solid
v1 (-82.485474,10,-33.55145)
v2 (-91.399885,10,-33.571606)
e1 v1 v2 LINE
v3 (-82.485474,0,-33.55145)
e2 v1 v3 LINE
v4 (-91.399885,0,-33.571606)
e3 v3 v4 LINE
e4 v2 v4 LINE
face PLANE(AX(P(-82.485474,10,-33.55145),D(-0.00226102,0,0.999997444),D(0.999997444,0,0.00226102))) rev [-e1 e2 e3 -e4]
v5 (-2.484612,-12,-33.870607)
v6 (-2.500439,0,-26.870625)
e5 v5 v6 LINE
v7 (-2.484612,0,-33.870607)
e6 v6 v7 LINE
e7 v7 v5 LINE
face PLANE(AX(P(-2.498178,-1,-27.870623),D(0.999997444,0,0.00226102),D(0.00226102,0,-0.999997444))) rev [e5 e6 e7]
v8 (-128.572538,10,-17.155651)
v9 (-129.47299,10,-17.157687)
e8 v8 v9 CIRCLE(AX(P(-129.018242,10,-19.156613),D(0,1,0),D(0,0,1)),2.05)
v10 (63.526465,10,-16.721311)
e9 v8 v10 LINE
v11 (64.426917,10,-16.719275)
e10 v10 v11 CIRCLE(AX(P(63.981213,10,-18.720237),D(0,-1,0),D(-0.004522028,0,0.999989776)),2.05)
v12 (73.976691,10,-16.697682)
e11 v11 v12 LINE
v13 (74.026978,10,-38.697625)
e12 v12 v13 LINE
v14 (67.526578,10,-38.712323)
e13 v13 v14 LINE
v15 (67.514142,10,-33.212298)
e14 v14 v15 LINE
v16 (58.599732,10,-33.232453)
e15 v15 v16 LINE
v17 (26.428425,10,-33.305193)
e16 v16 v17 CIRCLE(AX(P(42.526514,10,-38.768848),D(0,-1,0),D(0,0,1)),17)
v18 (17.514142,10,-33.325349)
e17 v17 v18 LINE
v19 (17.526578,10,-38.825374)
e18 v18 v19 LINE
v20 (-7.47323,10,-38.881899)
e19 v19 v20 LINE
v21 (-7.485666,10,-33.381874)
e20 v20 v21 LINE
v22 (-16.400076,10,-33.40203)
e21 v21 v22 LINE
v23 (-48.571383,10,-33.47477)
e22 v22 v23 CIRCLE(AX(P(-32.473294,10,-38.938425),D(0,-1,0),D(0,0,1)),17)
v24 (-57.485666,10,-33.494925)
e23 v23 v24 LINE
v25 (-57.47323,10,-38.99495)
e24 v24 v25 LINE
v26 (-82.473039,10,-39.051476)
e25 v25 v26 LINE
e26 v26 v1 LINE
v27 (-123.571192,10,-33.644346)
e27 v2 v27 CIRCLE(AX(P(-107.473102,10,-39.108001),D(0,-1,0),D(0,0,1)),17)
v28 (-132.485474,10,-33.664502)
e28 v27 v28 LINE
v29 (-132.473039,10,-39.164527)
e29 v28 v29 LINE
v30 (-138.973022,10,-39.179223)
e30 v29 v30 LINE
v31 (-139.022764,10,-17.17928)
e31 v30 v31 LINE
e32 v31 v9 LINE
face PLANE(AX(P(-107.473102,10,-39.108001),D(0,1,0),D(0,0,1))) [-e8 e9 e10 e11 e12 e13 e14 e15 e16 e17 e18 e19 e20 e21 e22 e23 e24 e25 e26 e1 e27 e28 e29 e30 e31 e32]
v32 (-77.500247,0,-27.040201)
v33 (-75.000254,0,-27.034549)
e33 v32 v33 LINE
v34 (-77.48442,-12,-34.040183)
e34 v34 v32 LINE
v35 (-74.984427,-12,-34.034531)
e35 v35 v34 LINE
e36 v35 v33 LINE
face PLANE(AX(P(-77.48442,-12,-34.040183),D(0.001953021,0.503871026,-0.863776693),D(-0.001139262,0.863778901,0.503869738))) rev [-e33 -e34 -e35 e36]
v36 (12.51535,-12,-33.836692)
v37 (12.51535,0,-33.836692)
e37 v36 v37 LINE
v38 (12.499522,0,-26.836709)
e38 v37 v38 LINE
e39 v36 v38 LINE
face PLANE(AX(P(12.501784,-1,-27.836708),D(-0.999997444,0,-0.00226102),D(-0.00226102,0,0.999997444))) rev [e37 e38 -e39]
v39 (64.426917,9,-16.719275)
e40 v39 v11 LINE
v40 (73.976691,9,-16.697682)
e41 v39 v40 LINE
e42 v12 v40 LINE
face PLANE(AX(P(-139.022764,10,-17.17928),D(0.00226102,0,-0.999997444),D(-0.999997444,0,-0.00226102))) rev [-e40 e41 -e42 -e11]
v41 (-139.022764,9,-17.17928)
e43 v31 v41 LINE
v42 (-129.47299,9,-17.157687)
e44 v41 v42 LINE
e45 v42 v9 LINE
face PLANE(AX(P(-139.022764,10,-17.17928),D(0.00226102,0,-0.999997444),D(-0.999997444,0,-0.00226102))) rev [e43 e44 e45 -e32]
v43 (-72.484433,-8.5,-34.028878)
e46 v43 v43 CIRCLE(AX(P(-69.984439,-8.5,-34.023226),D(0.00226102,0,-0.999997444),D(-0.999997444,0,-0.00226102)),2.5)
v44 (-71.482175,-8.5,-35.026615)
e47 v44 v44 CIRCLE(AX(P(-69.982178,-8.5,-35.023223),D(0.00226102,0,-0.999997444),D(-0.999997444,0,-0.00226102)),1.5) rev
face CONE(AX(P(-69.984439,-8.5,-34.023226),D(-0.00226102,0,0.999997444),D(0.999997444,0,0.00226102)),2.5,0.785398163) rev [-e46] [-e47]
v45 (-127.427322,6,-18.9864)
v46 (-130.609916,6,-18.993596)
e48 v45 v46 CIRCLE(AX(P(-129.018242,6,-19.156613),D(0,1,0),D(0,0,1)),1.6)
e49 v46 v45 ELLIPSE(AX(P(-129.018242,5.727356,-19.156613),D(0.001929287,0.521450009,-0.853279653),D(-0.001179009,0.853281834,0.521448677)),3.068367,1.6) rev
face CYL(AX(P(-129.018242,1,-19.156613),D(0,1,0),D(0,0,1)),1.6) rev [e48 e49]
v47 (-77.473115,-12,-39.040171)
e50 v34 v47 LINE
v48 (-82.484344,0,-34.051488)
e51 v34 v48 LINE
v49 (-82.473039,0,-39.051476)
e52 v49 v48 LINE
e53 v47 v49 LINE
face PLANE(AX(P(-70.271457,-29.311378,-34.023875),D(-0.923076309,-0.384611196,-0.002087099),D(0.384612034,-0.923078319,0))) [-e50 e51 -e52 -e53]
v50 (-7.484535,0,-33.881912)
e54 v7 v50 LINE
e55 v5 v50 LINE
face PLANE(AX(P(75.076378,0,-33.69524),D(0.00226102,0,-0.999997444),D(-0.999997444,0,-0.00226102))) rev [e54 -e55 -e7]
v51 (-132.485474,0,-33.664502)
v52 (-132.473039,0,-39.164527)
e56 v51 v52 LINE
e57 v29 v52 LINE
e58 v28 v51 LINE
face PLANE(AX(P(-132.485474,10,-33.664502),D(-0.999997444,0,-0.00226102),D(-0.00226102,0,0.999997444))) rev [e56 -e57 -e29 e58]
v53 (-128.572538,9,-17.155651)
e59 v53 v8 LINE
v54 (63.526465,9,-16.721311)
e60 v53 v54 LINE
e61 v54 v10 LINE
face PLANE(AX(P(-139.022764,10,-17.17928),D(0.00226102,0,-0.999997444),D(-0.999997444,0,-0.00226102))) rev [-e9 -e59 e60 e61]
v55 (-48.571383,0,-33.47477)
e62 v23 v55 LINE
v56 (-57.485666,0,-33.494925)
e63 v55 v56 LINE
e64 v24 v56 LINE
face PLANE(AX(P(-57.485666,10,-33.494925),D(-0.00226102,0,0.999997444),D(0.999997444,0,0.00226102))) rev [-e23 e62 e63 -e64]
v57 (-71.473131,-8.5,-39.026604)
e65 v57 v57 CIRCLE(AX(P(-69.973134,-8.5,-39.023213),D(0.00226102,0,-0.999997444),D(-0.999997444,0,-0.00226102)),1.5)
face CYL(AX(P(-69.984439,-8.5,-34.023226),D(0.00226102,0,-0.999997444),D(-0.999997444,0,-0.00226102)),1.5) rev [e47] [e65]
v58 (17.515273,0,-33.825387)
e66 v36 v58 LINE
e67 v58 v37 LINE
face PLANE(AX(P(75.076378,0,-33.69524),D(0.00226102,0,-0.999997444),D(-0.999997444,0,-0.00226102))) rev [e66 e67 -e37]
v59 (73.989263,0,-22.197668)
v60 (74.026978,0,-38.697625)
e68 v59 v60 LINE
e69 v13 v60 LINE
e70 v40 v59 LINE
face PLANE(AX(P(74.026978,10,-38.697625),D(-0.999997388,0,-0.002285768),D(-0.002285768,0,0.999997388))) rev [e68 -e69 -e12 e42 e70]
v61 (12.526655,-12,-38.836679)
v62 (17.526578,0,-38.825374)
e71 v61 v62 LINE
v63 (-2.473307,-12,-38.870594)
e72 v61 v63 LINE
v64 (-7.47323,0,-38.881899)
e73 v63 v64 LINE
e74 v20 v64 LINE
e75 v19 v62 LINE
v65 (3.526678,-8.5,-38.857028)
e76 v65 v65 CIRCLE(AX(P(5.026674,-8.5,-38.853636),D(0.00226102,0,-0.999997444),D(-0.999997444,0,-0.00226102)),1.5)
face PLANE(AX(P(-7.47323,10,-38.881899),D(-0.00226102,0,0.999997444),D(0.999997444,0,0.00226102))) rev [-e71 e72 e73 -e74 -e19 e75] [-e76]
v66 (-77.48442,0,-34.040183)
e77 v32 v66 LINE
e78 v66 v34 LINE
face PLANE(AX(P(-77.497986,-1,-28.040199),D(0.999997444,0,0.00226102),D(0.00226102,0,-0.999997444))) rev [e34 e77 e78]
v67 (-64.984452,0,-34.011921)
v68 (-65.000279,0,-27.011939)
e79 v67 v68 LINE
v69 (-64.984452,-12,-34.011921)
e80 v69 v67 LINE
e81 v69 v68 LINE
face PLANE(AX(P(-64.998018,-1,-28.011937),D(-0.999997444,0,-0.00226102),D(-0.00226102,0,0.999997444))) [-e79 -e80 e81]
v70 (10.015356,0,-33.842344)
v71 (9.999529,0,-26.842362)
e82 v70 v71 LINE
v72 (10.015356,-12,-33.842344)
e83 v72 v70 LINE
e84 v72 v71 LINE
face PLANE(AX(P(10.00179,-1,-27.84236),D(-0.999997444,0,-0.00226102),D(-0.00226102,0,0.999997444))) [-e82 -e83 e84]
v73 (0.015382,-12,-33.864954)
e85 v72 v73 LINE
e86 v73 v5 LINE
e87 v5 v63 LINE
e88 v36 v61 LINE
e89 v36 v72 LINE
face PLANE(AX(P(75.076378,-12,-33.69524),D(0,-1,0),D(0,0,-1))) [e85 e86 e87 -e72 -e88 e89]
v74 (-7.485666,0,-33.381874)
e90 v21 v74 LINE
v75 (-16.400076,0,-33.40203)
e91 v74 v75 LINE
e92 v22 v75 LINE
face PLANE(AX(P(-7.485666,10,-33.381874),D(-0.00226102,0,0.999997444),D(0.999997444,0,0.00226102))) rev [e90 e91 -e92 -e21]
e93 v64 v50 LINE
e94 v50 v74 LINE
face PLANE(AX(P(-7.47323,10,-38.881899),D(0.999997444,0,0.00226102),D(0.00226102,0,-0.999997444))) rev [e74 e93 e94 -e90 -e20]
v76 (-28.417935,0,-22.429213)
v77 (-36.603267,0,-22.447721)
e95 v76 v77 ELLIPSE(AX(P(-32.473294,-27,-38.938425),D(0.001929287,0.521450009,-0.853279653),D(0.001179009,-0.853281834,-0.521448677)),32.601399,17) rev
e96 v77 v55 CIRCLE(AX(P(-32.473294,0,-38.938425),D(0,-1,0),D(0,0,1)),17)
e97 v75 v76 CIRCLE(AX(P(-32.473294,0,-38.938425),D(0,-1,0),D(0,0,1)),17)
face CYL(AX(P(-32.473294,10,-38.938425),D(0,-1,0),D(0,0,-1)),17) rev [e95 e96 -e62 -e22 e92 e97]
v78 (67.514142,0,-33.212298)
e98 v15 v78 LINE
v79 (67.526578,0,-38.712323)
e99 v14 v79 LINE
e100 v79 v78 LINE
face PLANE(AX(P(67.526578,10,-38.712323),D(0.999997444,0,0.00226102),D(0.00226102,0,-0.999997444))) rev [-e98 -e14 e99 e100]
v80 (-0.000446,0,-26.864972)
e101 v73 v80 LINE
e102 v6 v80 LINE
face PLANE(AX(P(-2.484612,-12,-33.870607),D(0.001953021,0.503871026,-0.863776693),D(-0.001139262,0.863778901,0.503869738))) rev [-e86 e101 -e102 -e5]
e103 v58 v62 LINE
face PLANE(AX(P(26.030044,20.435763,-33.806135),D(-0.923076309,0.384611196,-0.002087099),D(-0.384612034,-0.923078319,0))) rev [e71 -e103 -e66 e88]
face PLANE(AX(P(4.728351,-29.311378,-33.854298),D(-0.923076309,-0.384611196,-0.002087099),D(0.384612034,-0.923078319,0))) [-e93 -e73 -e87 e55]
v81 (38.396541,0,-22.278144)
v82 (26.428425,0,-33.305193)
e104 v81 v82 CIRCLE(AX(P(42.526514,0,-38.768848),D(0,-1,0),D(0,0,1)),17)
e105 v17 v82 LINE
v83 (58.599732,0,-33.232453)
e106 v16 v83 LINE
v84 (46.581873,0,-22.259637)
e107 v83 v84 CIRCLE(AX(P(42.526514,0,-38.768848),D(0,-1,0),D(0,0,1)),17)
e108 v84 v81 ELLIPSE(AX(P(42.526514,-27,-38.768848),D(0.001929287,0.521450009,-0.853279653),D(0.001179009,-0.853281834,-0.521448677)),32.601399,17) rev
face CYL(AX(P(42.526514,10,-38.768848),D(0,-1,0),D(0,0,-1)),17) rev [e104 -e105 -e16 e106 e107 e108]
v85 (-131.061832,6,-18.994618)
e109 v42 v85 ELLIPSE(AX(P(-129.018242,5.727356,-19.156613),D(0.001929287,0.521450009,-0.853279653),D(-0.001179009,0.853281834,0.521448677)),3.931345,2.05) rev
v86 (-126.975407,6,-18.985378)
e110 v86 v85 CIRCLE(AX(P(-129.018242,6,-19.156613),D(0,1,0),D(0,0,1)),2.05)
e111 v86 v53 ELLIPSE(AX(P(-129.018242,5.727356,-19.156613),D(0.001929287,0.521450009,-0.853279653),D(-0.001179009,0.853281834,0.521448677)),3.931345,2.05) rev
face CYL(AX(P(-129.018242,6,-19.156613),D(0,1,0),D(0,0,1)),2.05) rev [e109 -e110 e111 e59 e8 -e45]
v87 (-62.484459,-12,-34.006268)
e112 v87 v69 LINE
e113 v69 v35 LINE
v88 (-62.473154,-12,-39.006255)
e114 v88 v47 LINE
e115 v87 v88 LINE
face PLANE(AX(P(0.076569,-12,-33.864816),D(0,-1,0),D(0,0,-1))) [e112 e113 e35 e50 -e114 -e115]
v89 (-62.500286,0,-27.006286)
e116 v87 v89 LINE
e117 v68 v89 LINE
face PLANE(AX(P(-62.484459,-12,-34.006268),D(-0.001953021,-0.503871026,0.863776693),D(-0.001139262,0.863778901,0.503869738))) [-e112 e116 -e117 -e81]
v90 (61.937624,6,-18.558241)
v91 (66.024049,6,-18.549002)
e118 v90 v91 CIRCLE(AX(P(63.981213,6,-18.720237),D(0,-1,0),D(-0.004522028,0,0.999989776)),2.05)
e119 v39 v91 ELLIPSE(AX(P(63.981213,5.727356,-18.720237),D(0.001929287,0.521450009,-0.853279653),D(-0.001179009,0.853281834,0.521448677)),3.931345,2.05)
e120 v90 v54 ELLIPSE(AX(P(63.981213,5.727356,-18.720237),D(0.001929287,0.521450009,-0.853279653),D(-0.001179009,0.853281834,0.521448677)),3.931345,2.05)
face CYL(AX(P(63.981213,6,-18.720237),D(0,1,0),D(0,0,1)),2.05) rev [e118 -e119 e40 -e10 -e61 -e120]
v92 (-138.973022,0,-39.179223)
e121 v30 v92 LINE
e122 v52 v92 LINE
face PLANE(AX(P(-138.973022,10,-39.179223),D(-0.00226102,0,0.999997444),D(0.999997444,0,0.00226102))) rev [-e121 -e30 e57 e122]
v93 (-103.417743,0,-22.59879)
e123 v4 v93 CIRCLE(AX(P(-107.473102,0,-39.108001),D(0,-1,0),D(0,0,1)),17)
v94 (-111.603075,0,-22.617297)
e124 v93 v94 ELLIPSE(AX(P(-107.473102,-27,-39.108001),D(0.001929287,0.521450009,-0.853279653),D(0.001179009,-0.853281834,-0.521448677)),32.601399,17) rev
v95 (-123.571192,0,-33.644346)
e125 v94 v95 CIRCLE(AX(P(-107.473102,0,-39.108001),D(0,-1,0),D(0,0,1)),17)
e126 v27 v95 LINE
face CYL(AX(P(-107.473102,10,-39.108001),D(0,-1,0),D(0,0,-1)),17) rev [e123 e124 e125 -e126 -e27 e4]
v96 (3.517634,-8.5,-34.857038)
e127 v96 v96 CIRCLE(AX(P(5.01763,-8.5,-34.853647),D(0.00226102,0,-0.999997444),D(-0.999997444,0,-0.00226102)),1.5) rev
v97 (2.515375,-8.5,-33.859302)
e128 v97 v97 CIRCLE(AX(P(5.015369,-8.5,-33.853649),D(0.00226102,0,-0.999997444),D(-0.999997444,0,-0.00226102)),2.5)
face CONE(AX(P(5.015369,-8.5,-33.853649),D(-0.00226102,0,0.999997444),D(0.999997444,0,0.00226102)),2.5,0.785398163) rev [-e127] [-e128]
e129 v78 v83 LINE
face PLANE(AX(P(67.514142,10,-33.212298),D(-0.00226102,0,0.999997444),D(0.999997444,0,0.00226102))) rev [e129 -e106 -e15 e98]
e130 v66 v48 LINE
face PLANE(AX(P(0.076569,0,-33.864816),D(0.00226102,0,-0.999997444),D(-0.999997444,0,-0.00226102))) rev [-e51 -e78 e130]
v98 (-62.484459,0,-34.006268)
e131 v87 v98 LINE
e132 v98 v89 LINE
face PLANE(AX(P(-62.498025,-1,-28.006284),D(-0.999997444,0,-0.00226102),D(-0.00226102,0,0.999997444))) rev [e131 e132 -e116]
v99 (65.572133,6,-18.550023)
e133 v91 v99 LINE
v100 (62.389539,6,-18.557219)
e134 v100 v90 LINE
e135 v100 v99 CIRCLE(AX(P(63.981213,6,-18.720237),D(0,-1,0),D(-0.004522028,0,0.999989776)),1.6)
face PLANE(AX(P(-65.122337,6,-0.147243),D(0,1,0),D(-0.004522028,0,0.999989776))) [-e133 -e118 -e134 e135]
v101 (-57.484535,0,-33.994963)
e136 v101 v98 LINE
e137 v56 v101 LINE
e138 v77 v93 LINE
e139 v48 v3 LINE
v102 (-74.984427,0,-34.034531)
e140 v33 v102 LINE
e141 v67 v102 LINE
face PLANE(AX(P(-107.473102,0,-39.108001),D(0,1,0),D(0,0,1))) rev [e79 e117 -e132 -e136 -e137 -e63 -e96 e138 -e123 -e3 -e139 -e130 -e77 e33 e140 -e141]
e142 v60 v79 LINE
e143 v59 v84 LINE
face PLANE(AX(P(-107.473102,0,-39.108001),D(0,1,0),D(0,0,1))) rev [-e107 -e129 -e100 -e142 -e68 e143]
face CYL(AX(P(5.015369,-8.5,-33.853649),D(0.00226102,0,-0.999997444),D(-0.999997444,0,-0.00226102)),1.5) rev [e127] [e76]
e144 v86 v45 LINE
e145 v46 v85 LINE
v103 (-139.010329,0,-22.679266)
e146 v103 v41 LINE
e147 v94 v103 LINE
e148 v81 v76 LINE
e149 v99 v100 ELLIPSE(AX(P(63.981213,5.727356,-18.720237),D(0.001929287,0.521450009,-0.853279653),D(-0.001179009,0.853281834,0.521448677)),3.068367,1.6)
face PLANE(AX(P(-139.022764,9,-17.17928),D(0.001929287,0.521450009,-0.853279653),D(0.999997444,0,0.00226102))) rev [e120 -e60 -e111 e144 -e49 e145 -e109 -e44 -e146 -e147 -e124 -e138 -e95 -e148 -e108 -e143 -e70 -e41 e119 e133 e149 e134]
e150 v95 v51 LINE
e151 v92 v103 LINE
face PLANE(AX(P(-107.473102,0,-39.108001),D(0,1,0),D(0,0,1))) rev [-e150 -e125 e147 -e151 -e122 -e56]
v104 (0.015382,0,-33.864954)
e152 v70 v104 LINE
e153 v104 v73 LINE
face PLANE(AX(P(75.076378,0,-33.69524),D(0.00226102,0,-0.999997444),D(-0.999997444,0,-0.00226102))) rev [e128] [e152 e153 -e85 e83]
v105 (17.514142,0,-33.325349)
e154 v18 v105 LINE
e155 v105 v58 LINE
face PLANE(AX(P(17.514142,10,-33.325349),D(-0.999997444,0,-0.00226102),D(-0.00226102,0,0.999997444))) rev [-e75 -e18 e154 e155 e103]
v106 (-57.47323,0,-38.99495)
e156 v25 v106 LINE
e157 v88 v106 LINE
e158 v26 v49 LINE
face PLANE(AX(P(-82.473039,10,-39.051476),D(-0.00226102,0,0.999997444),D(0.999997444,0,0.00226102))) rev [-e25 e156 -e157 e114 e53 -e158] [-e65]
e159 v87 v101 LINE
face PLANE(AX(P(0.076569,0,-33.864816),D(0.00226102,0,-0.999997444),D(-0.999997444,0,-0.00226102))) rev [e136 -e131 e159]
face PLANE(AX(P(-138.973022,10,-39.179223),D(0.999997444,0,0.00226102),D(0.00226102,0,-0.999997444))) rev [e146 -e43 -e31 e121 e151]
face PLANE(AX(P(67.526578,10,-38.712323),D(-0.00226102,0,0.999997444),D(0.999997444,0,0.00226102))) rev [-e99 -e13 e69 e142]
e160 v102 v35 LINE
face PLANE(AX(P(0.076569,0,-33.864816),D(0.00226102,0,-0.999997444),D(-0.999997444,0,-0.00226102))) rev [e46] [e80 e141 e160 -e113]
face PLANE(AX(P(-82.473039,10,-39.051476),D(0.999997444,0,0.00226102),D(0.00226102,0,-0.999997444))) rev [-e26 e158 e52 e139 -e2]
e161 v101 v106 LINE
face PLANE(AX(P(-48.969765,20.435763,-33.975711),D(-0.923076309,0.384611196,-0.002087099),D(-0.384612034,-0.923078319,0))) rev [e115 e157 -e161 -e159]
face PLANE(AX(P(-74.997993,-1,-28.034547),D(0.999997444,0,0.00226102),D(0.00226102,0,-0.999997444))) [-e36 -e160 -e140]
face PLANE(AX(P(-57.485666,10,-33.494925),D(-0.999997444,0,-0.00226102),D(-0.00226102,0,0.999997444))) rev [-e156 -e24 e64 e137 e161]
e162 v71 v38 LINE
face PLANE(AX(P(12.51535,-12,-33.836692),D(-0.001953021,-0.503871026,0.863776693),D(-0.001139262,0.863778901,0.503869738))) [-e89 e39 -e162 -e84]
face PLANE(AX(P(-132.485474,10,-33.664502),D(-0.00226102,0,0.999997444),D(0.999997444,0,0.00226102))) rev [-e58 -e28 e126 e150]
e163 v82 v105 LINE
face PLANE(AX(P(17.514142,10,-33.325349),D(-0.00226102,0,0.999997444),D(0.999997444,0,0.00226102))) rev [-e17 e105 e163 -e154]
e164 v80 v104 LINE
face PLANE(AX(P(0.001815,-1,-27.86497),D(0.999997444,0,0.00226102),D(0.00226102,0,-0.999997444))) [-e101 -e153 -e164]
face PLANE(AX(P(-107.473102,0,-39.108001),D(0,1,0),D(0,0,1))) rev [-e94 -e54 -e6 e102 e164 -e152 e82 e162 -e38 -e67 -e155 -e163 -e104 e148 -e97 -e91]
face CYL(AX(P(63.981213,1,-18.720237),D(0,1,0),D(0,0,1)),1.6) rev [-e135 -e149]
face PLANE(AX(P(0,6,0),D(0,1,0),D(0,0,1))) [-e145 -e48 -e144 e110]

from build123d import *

# Parameters (mm, degrees)
BOSS_EXTRUDE3_DEPTH        = 10
SKETCH4_R                  = 1.5
BOSS_EXTRUDE4_DEPTH        = 5
RIB6_REACH                 = 158.985
SKETCH5_WALL_W             = 329.861950248
SKETCH5_WALL_H             = 2.5
CHAMFER2_SIZE              = 1
CHAMFER3_SIZE              = 5.5
CHAMFER3_SIZE_2            = 9
LPATTERN4_COUNT            = 2
LPATTERN4_PITCH            = 75
LPATTERN4_COPY_1_REACH     = 158.985
LPATTERN4_COPY_1_SKETCH_W  = 329.861950248
LPATTERN4_COPY_1_SKETCH_H  = 2.5
CHAMFER2_OF_LPATTERN4_SIZE = 1
SKETCH8_R                  = 2.05
CUT_EXTRUDE1_DEPTH         = 4
SKETCH9_R                  = 1.6
CUT_EXTRUDE2_DEPTH         = 5


with BuildPart() as part:
    # Sketch2 → Boss-Extrude3 (new body)
    with BuildSketch(Plane(origin=(0, 0, 0), x_dir=(1, 0, 0), z_dir=(0, 1, 0))):
        with BuildLine():
            Line((-138.973021921, 39.179223473), (-139.022764358, 17.179279707))
            Line((-139.022764358, 17.179279707), (73.976691191, 16.697682479))
            Line((73.976691191, 16.697682479), (74.026978079, 38.697625014))
            Line((74.026978079, 38.697625014), (67.526578048, 38.712322585))
            Line((67.526578048, 38.712322585), (67.51414235, 33.212297518))
            Line((67.51414235, 33.212297518), (58.599731895, 33.232453229))
            ThreePointArc((58.599731895, 33.232453229), (42.488076808, 21.768891824), (26.428425, 33.305193378))
            Line((26.428425, 33.305193378), (17.51414235, 33.3253488))
            Line((17.51414235, 33.3253488), (17.526578048, 38.825373866))
            Line((17.526578048, 38.825373866), (-7.473230244, 38.881899074))
            Line((-7.473230244, 38.881899074), (-7.485665941, 33.381874007))
            Line((-7.485665941, 33.381874007), (-16.400076396, 33.402029717))
            ThreePointArc((-16.400076396, 33.402029717), (-32.511731484, 21.938468313), (-48.571383292, 33.474769867))
            Line((-48.571383292, 33.474769867), (-57.485665941, 33.494925288))
            Line((-57.485665941, 33.494925288), (-57.473230244, 38.994950355))
            Line((-57.473230244, 38.994950355), (-82.473038536, 39.051475562))
            Line((-82.473038536, 39.051475562), (-82.485474233, 33.551450496))
            Line((-82.485474233, 33.551450496), (-91.399884688, 33.571606206))
            ThreePointArc((-91.399884688, 33.571606206), (-107.511539776, 22.108044802), (-123.571191584, 33.644346356))
            Line((-123.571191584, 33.644346356), (-132.485474233, 33.664501777))
            Line((-132.485474233, 33.664501777), (-132.473038536, 39.164526844))
            Line((-132.473038536, 39.164526844), (-138.973021921, 39.179223473))
        make_face()
    extrude(amount=BOSS_EXTRUDE3_DEPTH)

    # Sketch4 → Boss-Extrude4 (add)
    with BuildSketch(Plane(origin=(0.087874316, 0, -38.864803222), x_dir=(-0.99999744389135, 0, -0.002261019850970016), z_dir=(0.002261019850970016, 0, -0.99999744389135))):
        Polygon((62.56118779, -12), (57.561251693, 0), (82.561123887, 0), (77.56118779, -12), align=None)
        with Locations((70.06118779, -8.5)):
            Circle(SKETCH4_R, mode=Mode.SUBTRACT)
    boss_extrude4 = extrude(amount=-BOSS_EXTRUDE4_DEPTH)

    # Sketch5 wall → Rib6 (add, up to next)
    with BuildSketch(Plane(origin=(-77.492333887, -6, -30.540192335), x_dir=(-0.001139262394, 0.863778900906, 0.503869737562), z_dir=(-0.001953021242, -0.503871025511, 0.863776692993)), mode=Mode.PRIVATE) as rib6_sk1:
        with Locations((0, -1.25)):
            Rectangle(SKETCH5_WALL_W, SKETCH5_WALL_H)
    rib6_tool1 = extrude(rib6_sk1.sketch, amount=-RIB6_REACH, mode=Mode.PRIVATE) - part.part
    rib6 = rib6_tool1.solids().sort_by_distance((-77.492333887, -6, -30.540192335))[0]
    add(rib6)

    # Mirror2: Rib6 across plane
    add(rib6.mirror(Plane(origin=(-70.061008706, 0, -0.158409736), x_dir=(-0.0022610198509701073, 0, 0.99999744389135), z_dir=(0.99999744389135, 0, 0.002261019850970107))))

    # Chamfer2
    chamfer2_edges = [part.edges().sort_by_distance(p)[0] for p in [
        (-68.484443323, -8.5, -34.01983421),
    ]]
    chamfer(chamfer2_edges, length=CHAMFER2_SIZE)

    # Chamfer3
    # the kernel refuses this chamfer: 9, 5.5 mm, written as the material it takes off along each edge
    with BuildSketch(Plane(origin=(-162.295390883, 0, -17.231899712), x_dir=(0.0022577295255832275, -0.053929224624231706, -0.9985422081158205), z_dir=(0.9999974438913499, 0, 0.0022610198509699707))) as chamfer3_piece_1:
        Polygon((CHAMFER3_SIZE * 0.998544760505, CHAMFER3_SIZE * 0.0539292246242), (-CHAMFER3_SIZE_2 * 0.0539292246242, CHAMFER3_SIZE_2 * 0.998544760505), (0, 0), align=None)
    extrude(amount=259.545372026, mode=Mode.SUBTRACT)

    # LPattern4: Boss-Extrude4, Rib6 ×2
    with Locations(*[Vector(0.9999974438913499, 0, 0.002261019850970079) * (i * LPATTERN4_PITCH) for i in range(1, LPATTERN4_COUNT)]):
        add(boss_extrude4)
        add(rib6)

    # LPattern4 copy 1 sketch → LPattern4 copy 1 (add, up to next)
    with BuildSketch(Plane(origin=(12.507436062, -6, -30.336700548), x_dir=(-0.0011392623880184954, 0.863778900906, 0.5038697375620136), z_dir=(-0.0019530212415939509, -0.503871025511, 0.863776692993001)), mode=Mode.PRIVATE) as lpattern4_copy_1_sk1:
        with Locations((0, 1.25)):
            Rectangle(LPATTERN4_COPY_1_SKETCH_W, LPATTERN4_COPY_1_SKETCH_H)
    lpattern4_copy_1_tool1 = extrude(lpattern4_copy_1_sk1.sketch, amount=-LPATTERN4_COPY_1_REACH, mode=Mode.PRIVATE) - part.part
    add(lpattern4_copy_1_tool1.solids().sort_by_distance((12.507436062, -6, -30.336700548))[0])

    # Chamfer2 of LPattern4
    chamfer2_of_lpattern4_edges = [part.edges().sort_by_distance(p)[0] for p in [
        (6.515364969, -8.5, -33.850257721),
    ]]
    chamfer(chamfer2_of_lpattern4_edges, length=CHAMFER2_OF_LPATTERN4_SIZE)

    # Sketch8 → Cut-Extrude1 (cut)
    with BuildSketch(Plane(origin=(0, 10, 0), x_dir=(1, 0, 0), z_dir=(0, 1, 0))):
        with Locations((-129.018242433, 19.156613217)):
            Circle(SKETCH8_R)
    cut_extrude1 = extrude(amount=-CUT_EXTRUDE1_DEPTH, mode=Mode.SUBTRACT)

    # Sketch9 → Cut-Extrude2 (cut)
    with BuildSketch(Plane(origin=(0, 6, 0), x_dir=(1, 0, 0), z_dir=(0, 1, 0))):
        with Locations((-129.018242433, 19.156613217)):
            Circle(SKETCH9_R)
    cut_extrude2 = extrude(amount=-CUT_EXTRUDE2_DEPTH, mode=Mode.SUBTRACT)

    # Mirror4: Cut-Extrude1, Cut-Extrude2 across plane
    add(cut_extrude1.mirror(Plane(origin=(-32.561168463, 0, -0.073621636), x_dir=(-0.002261019850969509, 0, 0.99999744389135), z_dir=(-0.99999744389135, 0, -0.0022610198509695084))), mode=Mode.SUBTRACT)
    add(cut_extrude2.mirror(Plane(origin=(-32.561168463, 0, -0.073621636), x_dir=(-0.002261019850969509, 0, 0.99999744389135), z_dir=(-0.99999744389135, 0, -0.0022610198509695084))), mode=Mode.SUBTRACT)


solid = part.part
